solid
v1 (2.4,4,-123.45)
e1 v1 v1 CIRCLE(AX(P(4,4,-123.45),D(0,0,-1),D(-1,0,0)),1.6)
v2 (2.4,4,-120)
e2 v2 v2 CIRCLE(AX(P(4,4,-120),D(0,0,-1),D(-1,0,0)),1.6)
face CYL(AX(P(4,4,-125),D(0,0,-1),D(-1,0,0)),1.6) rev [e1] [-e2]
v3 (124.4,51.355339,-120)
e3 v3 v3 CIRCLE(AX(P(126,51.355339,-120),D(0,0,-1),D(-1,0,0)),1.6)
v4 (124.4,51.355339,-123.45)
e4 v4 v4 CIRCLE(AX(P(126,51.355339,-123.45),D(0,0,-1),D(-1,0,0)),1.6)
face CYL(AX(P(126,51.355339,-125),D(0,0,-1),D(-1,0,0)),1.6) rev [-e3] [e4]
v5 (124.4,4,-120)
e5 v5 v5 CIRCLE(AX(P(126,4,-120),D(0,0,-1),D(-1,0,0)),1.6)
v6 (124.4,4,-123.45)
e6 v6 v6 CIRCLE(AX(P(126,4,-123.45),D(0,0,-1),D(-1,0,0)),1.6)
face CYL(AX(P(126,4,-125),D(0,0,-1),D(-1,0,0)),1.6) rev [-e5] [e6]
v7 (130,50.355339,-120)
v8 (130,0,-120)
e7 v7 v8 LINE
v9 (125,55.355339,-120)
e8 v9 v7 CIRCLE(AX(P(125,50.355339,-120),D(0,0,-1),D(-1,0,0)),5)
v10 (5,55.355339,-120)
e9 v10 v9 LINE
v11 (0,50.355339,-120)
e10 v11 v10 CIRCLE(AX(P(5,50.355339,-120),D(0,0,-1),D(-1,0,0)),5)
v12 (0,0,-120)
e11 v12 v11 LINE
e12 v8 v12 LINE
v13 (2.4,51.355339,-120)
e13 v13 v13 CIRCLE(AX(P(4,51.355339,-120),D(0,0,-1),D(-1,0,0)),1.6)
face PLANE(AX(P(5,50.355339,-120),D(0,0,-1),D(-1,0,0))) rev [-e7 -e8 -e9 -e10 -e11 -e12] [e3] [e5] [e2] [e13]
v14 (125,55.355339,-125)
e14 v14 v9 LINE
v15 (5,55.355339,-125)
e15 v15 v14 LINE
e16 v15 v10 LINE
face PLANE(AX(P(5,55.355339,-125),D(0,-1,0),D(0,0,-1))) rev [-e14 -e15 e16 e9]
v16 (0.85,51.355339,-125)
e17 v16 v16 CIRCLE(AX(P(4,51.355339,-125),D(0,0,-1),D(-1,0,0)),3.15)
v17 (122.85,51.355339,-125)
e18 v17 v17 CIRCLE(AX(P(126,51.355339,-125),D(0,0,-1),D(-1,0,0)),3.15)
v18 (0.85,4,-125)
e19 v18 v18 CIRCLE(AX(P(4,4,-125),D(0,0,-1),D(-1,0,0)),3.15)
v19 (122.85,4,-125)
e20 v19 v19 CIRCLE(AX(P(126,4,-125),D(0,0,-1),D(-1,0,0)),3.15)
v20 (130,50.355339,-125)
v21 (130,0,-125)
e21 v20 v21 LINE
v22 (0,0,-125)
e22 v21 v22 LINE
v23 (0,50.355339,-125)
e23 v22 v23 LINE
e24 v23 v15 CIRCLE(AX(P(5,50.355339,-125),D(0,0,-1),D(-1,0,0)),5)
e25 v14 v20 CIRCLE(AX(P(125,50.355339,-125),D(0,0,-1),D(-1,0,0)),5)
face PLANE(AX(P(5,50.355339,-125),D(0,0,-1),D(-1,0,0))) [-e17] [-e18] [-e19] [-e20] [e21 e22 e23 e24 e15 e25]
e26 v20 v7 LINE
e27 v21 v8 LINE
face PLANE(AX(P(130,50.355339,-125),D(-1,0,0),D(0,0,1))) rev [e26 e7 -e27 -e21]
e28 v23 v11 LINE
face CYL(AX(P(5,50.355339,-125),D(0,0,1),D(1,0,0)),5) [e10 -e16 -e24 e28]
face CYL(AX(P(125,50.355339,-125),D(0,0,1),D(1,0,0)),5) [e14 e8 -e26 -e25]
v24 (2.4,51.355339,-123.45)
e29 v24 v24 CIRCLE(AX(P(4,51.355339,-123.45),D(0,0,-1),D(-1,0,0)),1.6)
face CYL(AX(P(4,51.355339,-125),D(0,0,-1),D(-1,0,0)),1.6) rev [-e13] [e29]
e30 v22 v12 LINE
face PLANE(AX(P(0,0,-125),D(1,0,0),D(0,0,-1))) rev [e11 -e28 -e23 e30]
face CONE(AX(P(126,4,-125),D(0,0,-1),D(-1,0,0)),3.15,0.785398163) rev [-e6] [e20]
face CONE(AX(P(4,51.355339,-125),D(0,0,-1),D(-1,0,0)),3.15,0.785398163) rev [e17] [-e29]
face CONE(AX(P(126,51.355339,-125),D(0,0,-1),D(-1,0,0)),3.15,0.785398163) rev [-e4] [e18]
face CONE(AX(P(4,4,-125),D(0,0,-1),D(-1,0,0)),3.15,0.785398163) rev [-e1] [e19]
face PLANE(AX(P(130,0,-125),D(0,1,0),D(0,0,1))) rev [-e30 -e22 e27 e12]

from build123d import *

# Parameters (mm, degrees)
BOSS_EXTRUDE1_DEPTH                                 = 130
SHELL1_T                                            = -5
SKETCH3_R                                           = 3.4
SKETCH3_W                                           = 73.1
SKETCH3_H                                           = 26.5
CUT_EXTRUDE1_DEPTH                                  = 5
FILLET1_R                                           = 10
FILLET2_R                                           = 5
CUT_EXTRUDE2_DEPTH                                  = 5
FILLET3_R                                           = 5
CUT_EXTRUDE3_REACH                                  = 191.36
SKETCH5_R                                           = 1.4
CUT_EXTRUDE4_REACH                                  = 191.36
SKETCH6_R                                           = 1.1
CUT_EXTRUDE5_REACH                                  = 185.945
SKETCH7_R                                           = 1.5
CSK_FOR_M3_COUNTERSUNK_FLAT_HEAD_SCREW2_D           = 3.2
CSK_FOR_M3_COUNTERSUNK_FLAT_HEAD_SCREW2_DEPTH       = 8
CSK_FOR_M3_COUNTERSUNK_FLAT_HEAD_SCREW2_CSINK_D     = 6.3
CSK_FOR_M3_COUNTERSUNK_FLAT_HEAD_SCREW2_CSINK_ANGLE = 90
CSK_FOR_M3_COUNTERSUNK_FLAT_HEAD_SCREW2_TIP         = 0.96137699
CUT_EXTRUDE6_REACH                                  = 187.376
SKETCH15_R                                          = 1.2
CUT_EXTRUDE7_DEPTH                                  = 20
SKETCH16_R                                          = 1.2
BOSS_EXTRUDE2_DEPTH                                 = 5
CSK_FOR_M3_COUNTERSUNK_FLAT_HEAD_SCR_2_COUNT        = 2
CSK_FOR_M3_COUNTERSUNK_FLAT_HEAD_SCR_2_PITCH        = 47.355339059
CSK_FOR_M3_COUNTERSUNK_FLAT_HEAD_SCR_3_COUNT        = 2
CSK_FOR_M3_COUNTERSUNK_FLAT_HEAD_SCR_3_PITCH        = 122
CSK_FOR_M3_COUNTERSUNK_FLAT_HEAD_SCR_4_COUNT        = 2
CSK_FOR_M3_COUNTERSUNK_FLAT_HEAD_SCR_4_PITCH        = 130.868361866


with BuildPart() as part:
    # Sketch2 → Boss-Extrude1 (new body)
    with BuildSketch(Plane(origin=(0, 0, 0), x_dir=(0, 0, -1), z_dir=(1, 0, 0))):
        Polygon((0, 0), (0, 20), (35.355339059, 55.355339059), (120, 55.355339059), (120, 0), align=None)
    extrude(amount=BOSS_EXTRUDE1_DEPTH)

    # Shell1
    shell1_openings = [part.faces().sort_by_distance(p)[0] for p in [
        (65, 27.67766953, -120),
    ]]
    offset(amount=SHELL1_T, openings=shell1_openings, kind=Kind.INTERSECTION)

    # Sketch3 → Cut-Extrude1 (cut)
    with BuildSketch(Plane(origin=(0, 10, 10), x_dir=(1, 0, 0), z_dir=(0, 0.7071067811865486, 0.7071067811865465))):
        with Locations(Location((108.1, 39.142135624, 0), (0, 0, 270))):
            Circle(SKETCH3_R)
        with Locations((53.55, 39.142135624)):
            Rectangle(SKETCH3_W, SKETCH3_H)
    extrude(amount=-CUT_EXTRUDE1_DEPTH, mode=Mode.SUBTRACT)

    # Fillet1
    # the kernel refuses this fillet: 10 mm, written as the material it adds along each edge
    with BuildSketch(Plane(origin=(125, 50.355339059, -37.426406871), x_dir=(0, 0, -1), z_dir=(-1, 0, 0)), Plane(origin=(125, 17.928932188, -5), x_dir=(0, 0.7071067811865465, -0.7071067811865486), z_dir=(-1, 0, 0))) as fillet1_piece_1:
        with BuildLine():
            CenterArc((FILLET1_R * 0.414213562373, FILLET1_R), FILLET1_R, 225, 45)
            Line((-FILLET1_R * 0.292893218813, FILLET1_R * 0.292893218813), (0, 0))
            Line((0, 0), (FILLET1_R * 0.414213562373, 0))
        make_face()
    extrude(amount=120)
    with BuildSketch(Plane(origin=(5, 5, -5), x_dir=(0, 0, -1), z_dir=(1, 0, 0))) as fillet1_piece_2:
        with BuildLine():
            CenterArc((FILLET1_R, FILLET1_R), FILLET1_R, 180, 90)
            Line((0, FILLET1_R), (0, 0))
            Line((0, 0), (FILLET1_R, 0))
        make_face()
    extrude(amount=120)
    # the kernel refuses this fillet: 10 mm, written as the material it takes off along each edge
    with BuildSketch(Plane(origin=(-10.355339059, 20, 0), x_dir=(0, -1, 0), z_dir=(1, 0, 0)), Plane(origin=(-10.355339059, 55.355339059, -35.355339059), x_dir=(0, -0.7071067811865476, 0.7071067811865476), z_dir=(1, 0, 0))) as fillet1_2_piece_1:
        with BuildLine():
            CenterArc((FILLET1_R * 0.414213562373, FILLET1_R), FILLET1_R, 225, 45)
            Line((-FILLET1_R * 0.292893218813, FILLET1_R * 0.292893218813), (0, 0))
            Line((0, 0), (FILLET1_R * 0.414213562373, 0))
        make_face()
    extrude(amount=150.710678119, mode=Mode.SUBTRACT)

    # Fillet2
    fillet2_edges = [part.edges().sort_by_distance(p)[0] for p in [
        (130, 55.355339059, -79.748737342),
        (0, 7.928932188, 0),
        (130, 7.928932188, 0),
        (0, 37.67766953, -17.67766953),
        (0, 54.594134384, -35.670640359),
        (0, 19.6846987, -0.761204675),
        (130, 37.67766953, -17.67766953),
        (130, 54.594134384, -35.670640359),
        (130, 19.6846987, -0.761204675),
        (0, 55.355339059, -79.748737342),
    ]]
    fillet(fillet2_edges, radius=FILLET2_R)

    # Sketch4 → Cut-Extrude2 (cut)
    with BuildSketch(Plane(origin=(130, 0, 0), x_dir=(0, 0, -1), z_dir=(1, 0, 0))):
        with BuildLine():
            Line((108, 22), (112, 22))
            ThreePointArc((112, 22), (113.414213562, 21.414213562), (114, 20))
            Line((114, 20), (114, 17))
            ThreePointArc((114, 17), (113.414213562, 15.585786438), (112, 15))
            Line((112, 15), (108, 15))
            ThreePointArc((108, 15), (106.585786438, 15.585786438), (106, 17))
            Line((106, 17), (106, 20))
            ThreePointArc((106, 20), (106.585786438, 21.414213562), (108, 22))
        make_face()
    extrude(amount=-CUT_EXTRUDE2_DEPTH, mode=Mode.SUBTRACT)

    # Fillet3
    # the kernel refuses this fillet: 5 mm, written as the material it adds along each edge
    with BuildSketch(Plane(origin=(5, 50.355339059, -120), x_dir=(1, 0, 0), z_dir=(0, 0, 1))) as fillet3_piece_1:
        with BuildLine():
            CenterArc((FILLET3_R, -FILLET3_R), FILLET3_R, 90, 90)
            Line((0, -FILLET3_R), (0, 0))
            Line((0, 0), (FILLET3_R, 0))
        make_face()
    fillet3_piece_1_solid = extrude(amount=78.431457505, mode=Mode.PRIVATE)
    with BuildSketch(Plane(origin=(125, 50.355339059, -120), x_dir=(-1, 0, 0), z_dir=(0, 0, 1))) as fillet3_piece_2:
        with BuildLine():
            CenterArc((FILLET3_R, FILLET3_R), FILLET3_R, 180, 90)
            Line((0, FILLET3_R), (0, 0))
            Line((0, 0), (FILLET3_R, 0))
        make_face()
    fillet3_piece_2_solid = extrude(amount=78.431457505, mode=Mode.PRIVATE)
    with BuildSketch(Plane(origin=(5, 5, -15), x_dir=(0, 1, 0), z_dir=(0, 0, -1)), Plane(origin=(125, 5, -15), x_dir=(-1, 0, 0), z_dir=(0, 0, -1))) as fillet3_piece_3:
        with BuildLine():
            CenterArc((FILLET3_R, FILLET3_R), FILLET3_R, 180, 90)
            Line((0, FILLET3_R), (0, 0))
            Line((0, 0), (FILLET3_R, 0))
        make_face()
    fillet3_piece_3_solid = extrude(amount=105, mode=Mode.PRIVATE)
    with BuildSketch(Plane(origin=(5, 47.426406871, -34.497474683), x_dir=(0, -0.7071067811865487, -0.7071067811865464), z_dir=(0, -0.7071067811865465, 0.7071067811865487))) as fillet3_piece_4:
        with BuildLine():
            CenterArc((FILLET3_R, FILLET3_R), FILLET3_R, 180, 90)
            Line((0, FILLET3_R), (0, 0))
            Line((0, 0), (FILLET3_R, 0))
        make_face()
    fillet3_piece_4_solid = extrude(amount=37.573593129, mode=Mode.PRIVATE)
    with BuildSketch(Plane(origin=(5, 13.786796564, -15), x_dir=(0, -0.9281493111658919, 0.3722080818336436), z_dir=(0, -0.3722080818336436, -0.9281493111658919))) as fillet3_piece_5:
        with BuildLine():
            CenterArc((10 - FILLET3_R, -FILLET3_R), FILLET3_R, 0, 90)
            Line((10, -FILLET3_R), (10, 0))
            Line((10, 0), (10 - FILLET3_R, 0))
        make_face()
    fillet3_piece_5_solid = revolve(axis=Axis((5, 13.786796564, -15), (-1, 0, 0)), revolution_arc=113.148139986, mode=Mode.PRIVATE)
    with BuildSketch(Plane(origin=(5, 15, -15), x_dir=(0, 0.9282822091618541, 0.37187651196813665), z_dir=(0, 0.37187651196813665, -0.9282822091618541))) as fillet3_piece_6:
        with BuildLine():
            CenterArc((10 - FILLET3_R, FILLET3_R), FILLET3_R, 270, 90)
            Line((10, FILLET3_R), (10, 0))
            Line((10, 0), (10 - FILLET3_R, 0))
        make_face()
    fillet3_piece_6_solid = revolve(axis=Axis((5, 15, -15), (1, 0, 0)), revolution_arc=158.168606729, mode=Mode.PRIVATE)
    with BuildSketch(Plane(origin=(5, 40.355339059, -41.568542495), x_dir=(0, 0.7071067811865476, 0.7071067811865476), z_dir=(0, -0.7071067811865476, 0.7071067811865476))) as fillet3_piece_7:
        with BuildLine():
            CenterArc((10 - FILLET3_R, -FILLET3_R), FILLET3_R, 0, 90)
            Line((10, -FILLET3_R), (10, 0))
            Line((10, 0), (10 - FILLET3_R, 0))
        make_face()
    fillet3_piece_7_solid = revolve(axis=Axis((5, 40.355339059, -41.568542495), (-1, 0, 0)), revolution_arc=45, mode=Mode.PRIVATE)
    with BuildSketch(Plane(origin=(125, 47.426406871, -34.497474683), x_dir=(-2.842170943040401e-15, -0.7071067811865487, -0.7071067811865464), z_dir=(0, -0.7071067811865465, 0.7071067811865487))) as fillet3_piece_8:
        with BuildLine():
            CenterArc((FILLET3_R, -FILLET3_R), FILLET3_R, 90, 90)
            Line((0, -FILLET3_R), (0, 0))
            Line((0, 0), (FILLET3_R, 0))
        make_face()
    fillet3_piece_8_solid = extrude(amount=37.573593129, mode=Mode.PRIVATE)
    with BuildSketch(Plane(origin=(125, 13.786796564, -15), x_dir=(0, -0.9281493111658919, 0.3722080818336436), z_dir=(0, -0.3722080818336436, -0.9281493111658919))) as fillet3_piece_9:
        with BuildLine():
            CenterArc((10 - FILLET3_R, FILLET3_R), FILLET3_R, 270, 90)
            Line((10, FILLET3_R), (10, 0))
            Line((10, 0), (10 - FILLET3_R, 0))
        make_face()
    fillet3_piece_9_solid = revolve(axis=Axis((125, 13.786796564, -15), (-1, 0, 0)), revolution_arc=113.148139986, mode=Mode.PRIVATE)
    with BuildSketch(Plane(origin=(125, 15, -15), x_dir=(0, 0.9282822091618541, 0.37187651196813665), z_dir=(0, 0.37187651196813665, -0.9282822091618541))) as fillet3_piece_10:
        with BuildLine():
            CenterArc((10 - FILLET3_R, -FILLET3_R), FILLET3_R, 0, 90)
            Line((10, -FILLET3_R), (10, 0))
            Line((10, 0), (10 - FILLET3_R, 0))
        make_face()
    fillet3_piece_10_solid = revolve(axis=Axis((125, 15, -15), (1, 0, 0)), revolution_arc=158.168606729, mode=Mode.PRIVATE)
    with BuildSketch(Plane(origin=(125, 40.355339059, -41.568542495), x_dir=(0, 0.7071067811865476, 0.7071067811865476), z_dir=(0, -0.7071067811865476, 0.7071067811865476))) as fillet3_piece_11:
        with BuildLine():
            CenterArc((10 - FILLET3_R, FILLET3_R), FILLET3_R, 270, 90)
            Line((10, FILLET3_R), (10, 0))
            Line((10, 0), (10 - FILLET3_R, 0))
        make_face()
    fillet3_piece_11_solid = revolve(axis=Axis((125, 40.355339059, -41.568542495), (-1, 0, 0)), revolution_arc=45, mode=Mode.PRIVATE)
    add([fillet3_piece_1_solid, fillet3_piece_2_solid, fillet3_piece_3_solid, fillet3_piece_4_solid, fillet3_piece_5_solid, fillet3_piece_6_solid, fillet3_piece_7_solid, fillet3_piece_8_solid, fillet3_piece_9_solid, fillet3_piece_10_solid, fillet3_piece_11_solid])

    # Sketch5 → Cut-Extrude3 (cut, up to next)
    with BuildSketch(Plane(origin=(0, 10, 10), x_dir=(1, 0, 0), z_dir=(0, 0.7071067811865486, 0.7071067811865465)), mode=Mode.PRIVATE) as cut_extrude3_sk1:
        with Locations(Location((116.3, 48.442135624, 0), (0, 0, 270))):
            Circle(SKETCH5_R)
    cut_extrude3_tool1 = extrude(cut_extrude3_sk1.sketch, amount=-CUT_EXTRUDE3_REACH, mode=Mode.PRIVATE) & part.part
    # Sketch5 → Cut-Extrude3 (cut, up to next)
    with BuildSketch(Plane(origin=(0, 10, 10), x_dir=(1, 0, 0), z_dir=(0, 0.7071067811865486, 0.7071067811865465)), mode=Mode.PRIVATE) as cut_extrude3_sk2:
        with Locations(Location((116.3, 34.442135624, 0), (0, 0, 270))):
            Circle(SKETCH5_R)
    cut_extrude3_tool2 = extrude(cut_extrude3_sk2.sketch, amount=-CUT_EXTRUDE3_REACH, mode=Mode.PRIVATE) & part.part
    add(cut_extrude3_tool1.solids().sort_by_distance((116.3, 44.253763, -24.253763))[0], mode=Mode.SUBTRACT)
    add(cut_extrude3_tool2.solids().sort_by_distance((116.3, 34.354268, -14.354268))[0], mode=Mode.SUBTRACT)

    # Sketch6 → Cut-Extrude4 (cut, up to next)
    with BuildSketch(Plane(origin=(0, 10, 10), x_dir=(1, 0, 0), z_dir=(0, 0.7071067811865486, 0.7071067811865465)), mode=Mode.PRIVATE) as cut_extrude4_sk1:
        with Locations(Location((15.8, 54.392135624, 0), (0, 0, 270))):
            Circle(SKETCH6_R)
    cut_extrude4_tool1 = extrude(cut_extrude4_sk1.sketch, amount=-CUT_EXTRUDE4_REACH, mode=Mode.PRIVATE) & part.part
    # Sketch6 → Cut-Extrude4 (cut, up to next)
    with BuildSketch(Plane(origin=(0, 10, 10), x_dir=(1, 0, 0), z_dir=(0, 0.7071067811865486, 0.7071067811865465)), mode=Mode.PRIVATE) as cut_extrude4_sk2:
        with Locations(Location((90.8, 54.392135624, 0), (0, 0, 270))):
            Circle(SKETCH6_R)
    cut_extrude4_tool2 = extrude(cut_extrude4_sk2.sketch, amount=-CUT_EXTRUDE4_REACH, mode=Mode.PRIVATE) & part.part
    # Sketch6 → Cut-Extrude4 (cut, up to next)
    with BuildSketch(Plane(origin=(0, 10, 10), x_dir=(1, 0, 0), z_dir=(0, 0.7071067811865486, 0.7071067811865465)), mode=Mode.PRIVATE) as cut_extrude4_sk3:
        with Locations(Location((90.8, 23.392135624, 0), (0, 0, 270))):
            Circle(SKETCH6_R)
    cut_extrude4_tool3 = extrude(cut_extrude4_sk3.sketch, amount=-CUT_EXTRUDE4_REACH, mode=Mode.PRIVATE) & part.part
    # Sketch6 → Cut-Extrude4 (cut, up to next)
    with BuildSketch(Plane(origin=(0, 10, 10), x_dir=(1, 0, 0), z_dir=(0, 0.7071067811865486, 0.7071067811865465)), mode=Mode.PRIVATE) as cut_extrude4_sk4:
        with Locations(Location((15.8, 23.392135624, 0), (0, 0, 270))):
            Circle(SKETCH6_R)
    cut_extrude4_tool4 = extrude(cut_extrude4_sk4.sketch, amount=-CUT_EXTRUDE4_REACH, mode=Mode.PRIVATE) & part.part
    add(cut_extrude4_tool1.solids().sort_by_distance((15.8, 48.461048, -28.461048))[0], mode=Mode.SUBTRACT)
    add(cut_extrude4_tool2.solids().sort_by_distance((90.8, 48.461048, -28.461048))[0], mode=Mode.SUBTRACT)
    add(cut_extrude4_tool3.solids().sort_by_distance((90.8, 26.540738, -6.540738))[0], mode=Mode.SUBTRACT)
    add(cut_extrude4_tool4.solids().sort_by_distance((15.8, 26.540738, -6.540738))[0], mode=Mode.SUBTRACT)

    # Sketch7 → Cut-Extrude5 (cut, up to next)
    with BuildSketch(Plane(origin=(0, 5, 0), x_dir=(1, 0, 0), z_dir=(0, 1, 0)), mode=Mode.PRIVATE) as cut_extrude5_sk1:
        with Locations(Location((16.5, 21.5, 0), (0, 0, 270))):
            Circle(SKETCH7_R)
    cut_extrude5_tool1 = extrude(cut_extrude5_sk1.sketch, amount=-CUT_EXTRUDE5_REACH, mode=Mode.PRIVATE) & part.part
    # Sketch7 → Cut-Extrude5 (cut, up to next)
    with BuildSketch(Plane(origin=(0, 5, 0), x_dir=(1, 0, 0), z_dir=(0, 1, 0)), mode=Mode.PRIVATE) as cut_extrude5_sk2:
        with Locations(Location((16.5, 64.5, 0), (0, 0, 270))):
            Circle(SKETCH7_R)
    cut_extrude5_tool2 = extrude(cut_extrude5_sk2.sketch, amount=-CUT_EXTRUDE5_REACH, mode=Mode.PRIVATE) & part.part
    # Sketch7 → Cut-Extrude5 (cut, up to next)
    with BuildSketch(Plane(origin=(0, 5, 0), x_dir=(1, 0, 0), z_dir=(0, 1, 0)), mode=Mode.PRIVATE) as cut_extrude5_sk3:
        with Locations(Location((109.5, 21.5, 0), (0, 0, 270))):
            Circle(SKETCH7_R)
    cut_extrude5_tool3 = extrude(cut_extrude5_sk3.sketch, amount=-CUT_EXTRUDE5_REACH, mode=Mode.PRIVATE) & part.part
    # Sketch7 → Cut-Extrude5 (cut, up to next)
    with BuildSketch(Plane(origin=(0, 5, 0), x_dir=(1, 0, 0), z_dir=(0, 1, 0)), mode=Mode.PRIVATE) as cut_extrude5_sk4:
        with Locations(Location((109.5, 64.5, 0), (0, 0, 270))):
            Circle(SKETCH7_R)
    cut_extrude5_tool4 = extrude(cut_extrude5_sk4.sketch, amount=-CUT_EXTRUDE5_REACH, mode=Mode.PRIVATE) & part.part
    # Sketch7 → Cut-Extrude5 (cut, up to next)
    with BuildSketch(Plane(origin=(0, 5, 0), x_dir=(1, 0, 0), z_dir=(0, 1, 0)), mode=Mode.PRIVATE) as cut_extrude5_sk5:
        with Locations(Location((109, 79, 0), (0, 0, 270))):
            Circle(SKETCH7_R)
    cut_extrude5_tool5 = extrude(cut_extrude5_sk5.sketch, amount=-CUT_EXTRUDE5_REACH, mode=Mode.PRIVATE) & part.part
    # Sketch7 → Cut-Extrude5 (cut, up to next)
    with BuildSketch(Plane(origin=(0, 5, 0), x_dir=(1, 0, 0), z_dir=(0, 1, 0)), mode=Mode.PRIVATE) as cut_extrude5_sk6:
        with Locations(Location((53, 79, 0), (0, 0, 270))):
            Circle(SKETCH7_R)
    cut_extrude5_tool6 = extrude(cut_extrude5_sk6.sketch, amount=-CUT_EXTRUDE5_REACH, mode=Mode.PRIVATE) & part.part
    # Sketch7 → Cut-Extrude5 (cut, up to next)
    with BuildSketch(Plane(origin=(0, 5, 0), x_dir=(1, 0, 0), z_dir=(0, 1, 0)), mode=Mode.PRIVATE) as cut_extrude5_sk7:
        with Locations(Location((53, 115, 0), (0, 0, 270))):
            Circle(SKETCH7_R)
    cut_extrude5_tool7 = extrude(cut_extrude5_sk7.sketch, amount=-CUT_EXTRUDE5_REACH, mode=Mode.PRIVATE) & part.part
    # Sketch7 → Cut-Extrude5 (cut, up to next)
    with BuildSketch(Plane(origin=(0, 5, 0), x_dir=(1, 0, 0), z_dir=(0, 1, 0)), mode=Mode.PRIVATE) as cut_extrude5_sk8:
        with Locations(Location((109, 115, 0), (0, 0, 270))):
            Circle(SKETCH7_R)
    cut_extrude5_tool8 = extrude(cut_extrude5_sk8.sketch, amount=-CUT_EXTRUDE5_REACH, mode=Mode.PRIVATE) & part.part
    add(cut_extrude5_tool1.solids().sort_by_distance((16.5, 5, -21.5))[0], mode=Mode.SUBTRACT)
    add(cut_extrude5_tool2.solids().sort_by_distance((16.5, 5, -64.5))[0], mode=Mode.SUBTRACT)
    add(cut_extrude5_tool3.solids().sort_by_distance((109.5, 5, -21.5))[0], mode=Mode.SUBTRACT)
    add(cut_extrude5_tool4.solids().sort_by_distance((109.5, 5, -64.5))[0], mode=Mode.SUBTRACT)
    add(cut_extrude5_tool5.solids().sort_by_distance((109, 5, -79))[0], mode=Mode.SUBTRACT)
    add(cut_extrude5_tool6.solids().sort_by_distance((53, 5, -79))[0], mode=Mode.SUBTRACT)
    add(cut_extrude5_tool7.solids().sort_by_distance((53, 5, -115))[0], mode=Mode.SUBTRACT)
    add(cut_extrude5_tool8.solids().sort_by_distance((109, 5, -115))[0], mode=Mode.SUBTRACT)

    # CSK for M3 Countersunk Flat Head Screw2
    with Locations(Plane(origin=(0, 0, 0), x_dir=(-1, 0, 0), z_dir=(0, -1, 0))):
        with Locations((-109, 115), (-53, 115), (-53, 79), (-109, 79), (-16.5, 64.5), (-16.5, 21.5), (-109.5, 21.5), (-109.5, 64.5)):
            CounterSinkHole(CSK_FOR_M3_COUNTERSUNK_FLAT_HEAD_SCREW2_D / 2, CSK_FOR_M3_COUNTERSUNK_FLAT_HEAD_SCREW2_CSINK_D / 2, depth=CSK_FOR_M3_COUNTERSUNK_FLAT_HEAD_SCREW2_DEPTH, counter_sink_angle=CSK_FOR_M3_COUNTERSUNK_FLAT_HEAD_SCREW2_CSINK_ANGLE)
            with Locations((0, 0, -(CSK_FOR_M3_COUNTERSUNK_FLAT_HEAD_SCREW2_DEPTH + CSK_FOR_M3_COUNTERSUNK_FLAT_HEAD_SCREW2_TIP / 2))):  # 118° drill point
                Cone(0, CSK_FOR_M3_COUNTERSUNK_FLAT_HEAD_SCREW2_D / 2, CSK_FOR_M3_COUNTERSUNK_FLAT_HEAD_SCREW2_TIP, mode=Mode.SUBTRACT)

    # Sketch14 → Cut-Extrude6 (cut, up to next)
    with BuildSketch(Plane.ZY, mode=Mode.PRIVATE) as cut_extrude6_sk1:
        with BuildLine():
            Line((-34, 18.5), (-30, 18.5))
            ThreePointArc((-30, 18.5), (-26, 14.5), (-30, 10.5))
            Line((-30, 10.5), (-34, 10.5))
            ThreePointArc((-34, 10.5), (-38, 14.5), (-34, 18.5))
        make_face()
    cut_extrude6_tool1 = extrude(cut_extrude6_sk1.sketch, amount=-CUT_EXTRUDE6_REACH, mode=Mode.PRIVATE) & part.part
    add(cut_extrude6_tool1.solids().sort_by_distance((0, 14.5, -32))[0], mode=Mode.SUBTRACT)

    # Sketch15 → Cut-Extrude7 (cut)
    with BuildSketch(Plane(origin=(0, 0, -120), x_dir=(-1, 0, 0), z_dir=(0, 0, -1))):
        with Locations((-126, 51.355339059)):
            Circle(SKETCH15_R)
        with Locations((-126, 4)):
            Circle(SKETCH15_R)
        with Locations((-4, 4)):
            Circle(SKETCH15_R)
        with Locations((-4, 51.355339059)):
            Circle(SKETCH15_R)
    extrude(amount=-CUT_EXTRUDE7_DEPTH, mode=Mode.SUBTRACT)


with BuildPart() as body_2:
    # Sketch16 → Boss-Extrude2 (new body)
    with BuildSketch(Plane(origin=(0, 0, -120), x_dir=(-1, 0, 0), z_dir=(0, 0, -1))):
        with BuildLine():
            Line((0, 0), (0, 50.355339059))
            ThreePointArc((0, 50.355339059), (-1.464466094, 53.890872965), (-5, 55.355339059))
            Line((-5, 55.355339059), (-125, 55.355339059))
            ThreePointArc((-125, 55.355339059), (-128.535533906, 53.890872965), (-130, 50.355339059))
            Line((-130, 50.355339059), (-130, 0))
            Line((-130, 0), (0, 0))
        make_face()
        with Locations((-126, 4)):
            Circle(SKETCH16_R, mode=Mode.SUBTRACT)
        with Locations((-4, 4)):
            Circle(SKETCH16_R, mode=Mode.SUBTRACT)
        with Locations((-4, 51.355339059)):
            Circle(SKETCH16_R, mode=Mode.SUBTRACT)
        with Locations((-126, 51.355339059)):
            Circle(SKETCH16_R, mode=Mode.SUBTRACT)
    extrude(amount=BOSS_EXTRUDE2_DEPTH)

    # Sketch20 → CSK for M3 Countersunk Flat Head Screw3 (revolve, cut)
    with BuildSketch(Plane(origin=(126, 51.355339059, -125), x_dir=(0, 1, 0), z_dir=(1, 0, 0))):
        Polygon((0, 0), (0, 8.96137699), (1.6, 8), (1.6, 1.55), (3.15, 0), align=None)
    csk_for_m3_countersunk_flat_head_screw3 = revolve(axis=Axis((126, 51.355339059, -131.35), (0, 0, 1)), mode=Mode.SUBTRACT)

    # CSK for M3 Countersunk Flat Head Scr 2: CSK for M3 Countersunk Flat Head Screw3 ×2
    with Locations(*[(0, -i * CSK_FOR_M3_COUNTERSUNK_FLAT_HEAD_SCR_2_PITCH, 0) for i in range(1, CSK_FOR_M3_COUNTERSUNK_FLAT_HEAD_SCR_2_COUNT)]):
        add(csk_for_m3_countersunk_flat_head_screw3, mode=Mode.SUBTRACT)

    # CSK for M3 Countersunk Flat Head Scr 3: CSK for M3 Countersunk Flat Head Screw3 ×2
    with Locations(*[(-i * CSK_FOR_M3_COUNTERSUNK_FLAT_HEAD_SCR_3_PITCH, 0, 0) for i in range(1, CSK_FOR_M3_COUNTERSUNK_FLAT_HEAD_SCR_3_COUNT)]):
        add(csk_for_m3_countersunk_flat_head_screw3, mode=Mode.SUBTRACT)

    # CSK for M3 Countersunk Flat Head Scr 4: CSK for M3 Countersunk Flat Head Screw3 ×2
    with Locations(*[Vector(-0.9322344855600483, -0.3618547552991284, 0) * (i * CSK_FOR_M3_COUNTERSUNK_FLAT_HEAD_SCR_4_PITCH) for i in range(1, CSK_FOR_M3_COUNTERSUNK_FLAT_HEAD_SCR_4_COUNT)]):
        add(csk_for_m3_countersunk_flat_head_screw3, mode=Mode.SUBTRACT)


solid = body_2.part
